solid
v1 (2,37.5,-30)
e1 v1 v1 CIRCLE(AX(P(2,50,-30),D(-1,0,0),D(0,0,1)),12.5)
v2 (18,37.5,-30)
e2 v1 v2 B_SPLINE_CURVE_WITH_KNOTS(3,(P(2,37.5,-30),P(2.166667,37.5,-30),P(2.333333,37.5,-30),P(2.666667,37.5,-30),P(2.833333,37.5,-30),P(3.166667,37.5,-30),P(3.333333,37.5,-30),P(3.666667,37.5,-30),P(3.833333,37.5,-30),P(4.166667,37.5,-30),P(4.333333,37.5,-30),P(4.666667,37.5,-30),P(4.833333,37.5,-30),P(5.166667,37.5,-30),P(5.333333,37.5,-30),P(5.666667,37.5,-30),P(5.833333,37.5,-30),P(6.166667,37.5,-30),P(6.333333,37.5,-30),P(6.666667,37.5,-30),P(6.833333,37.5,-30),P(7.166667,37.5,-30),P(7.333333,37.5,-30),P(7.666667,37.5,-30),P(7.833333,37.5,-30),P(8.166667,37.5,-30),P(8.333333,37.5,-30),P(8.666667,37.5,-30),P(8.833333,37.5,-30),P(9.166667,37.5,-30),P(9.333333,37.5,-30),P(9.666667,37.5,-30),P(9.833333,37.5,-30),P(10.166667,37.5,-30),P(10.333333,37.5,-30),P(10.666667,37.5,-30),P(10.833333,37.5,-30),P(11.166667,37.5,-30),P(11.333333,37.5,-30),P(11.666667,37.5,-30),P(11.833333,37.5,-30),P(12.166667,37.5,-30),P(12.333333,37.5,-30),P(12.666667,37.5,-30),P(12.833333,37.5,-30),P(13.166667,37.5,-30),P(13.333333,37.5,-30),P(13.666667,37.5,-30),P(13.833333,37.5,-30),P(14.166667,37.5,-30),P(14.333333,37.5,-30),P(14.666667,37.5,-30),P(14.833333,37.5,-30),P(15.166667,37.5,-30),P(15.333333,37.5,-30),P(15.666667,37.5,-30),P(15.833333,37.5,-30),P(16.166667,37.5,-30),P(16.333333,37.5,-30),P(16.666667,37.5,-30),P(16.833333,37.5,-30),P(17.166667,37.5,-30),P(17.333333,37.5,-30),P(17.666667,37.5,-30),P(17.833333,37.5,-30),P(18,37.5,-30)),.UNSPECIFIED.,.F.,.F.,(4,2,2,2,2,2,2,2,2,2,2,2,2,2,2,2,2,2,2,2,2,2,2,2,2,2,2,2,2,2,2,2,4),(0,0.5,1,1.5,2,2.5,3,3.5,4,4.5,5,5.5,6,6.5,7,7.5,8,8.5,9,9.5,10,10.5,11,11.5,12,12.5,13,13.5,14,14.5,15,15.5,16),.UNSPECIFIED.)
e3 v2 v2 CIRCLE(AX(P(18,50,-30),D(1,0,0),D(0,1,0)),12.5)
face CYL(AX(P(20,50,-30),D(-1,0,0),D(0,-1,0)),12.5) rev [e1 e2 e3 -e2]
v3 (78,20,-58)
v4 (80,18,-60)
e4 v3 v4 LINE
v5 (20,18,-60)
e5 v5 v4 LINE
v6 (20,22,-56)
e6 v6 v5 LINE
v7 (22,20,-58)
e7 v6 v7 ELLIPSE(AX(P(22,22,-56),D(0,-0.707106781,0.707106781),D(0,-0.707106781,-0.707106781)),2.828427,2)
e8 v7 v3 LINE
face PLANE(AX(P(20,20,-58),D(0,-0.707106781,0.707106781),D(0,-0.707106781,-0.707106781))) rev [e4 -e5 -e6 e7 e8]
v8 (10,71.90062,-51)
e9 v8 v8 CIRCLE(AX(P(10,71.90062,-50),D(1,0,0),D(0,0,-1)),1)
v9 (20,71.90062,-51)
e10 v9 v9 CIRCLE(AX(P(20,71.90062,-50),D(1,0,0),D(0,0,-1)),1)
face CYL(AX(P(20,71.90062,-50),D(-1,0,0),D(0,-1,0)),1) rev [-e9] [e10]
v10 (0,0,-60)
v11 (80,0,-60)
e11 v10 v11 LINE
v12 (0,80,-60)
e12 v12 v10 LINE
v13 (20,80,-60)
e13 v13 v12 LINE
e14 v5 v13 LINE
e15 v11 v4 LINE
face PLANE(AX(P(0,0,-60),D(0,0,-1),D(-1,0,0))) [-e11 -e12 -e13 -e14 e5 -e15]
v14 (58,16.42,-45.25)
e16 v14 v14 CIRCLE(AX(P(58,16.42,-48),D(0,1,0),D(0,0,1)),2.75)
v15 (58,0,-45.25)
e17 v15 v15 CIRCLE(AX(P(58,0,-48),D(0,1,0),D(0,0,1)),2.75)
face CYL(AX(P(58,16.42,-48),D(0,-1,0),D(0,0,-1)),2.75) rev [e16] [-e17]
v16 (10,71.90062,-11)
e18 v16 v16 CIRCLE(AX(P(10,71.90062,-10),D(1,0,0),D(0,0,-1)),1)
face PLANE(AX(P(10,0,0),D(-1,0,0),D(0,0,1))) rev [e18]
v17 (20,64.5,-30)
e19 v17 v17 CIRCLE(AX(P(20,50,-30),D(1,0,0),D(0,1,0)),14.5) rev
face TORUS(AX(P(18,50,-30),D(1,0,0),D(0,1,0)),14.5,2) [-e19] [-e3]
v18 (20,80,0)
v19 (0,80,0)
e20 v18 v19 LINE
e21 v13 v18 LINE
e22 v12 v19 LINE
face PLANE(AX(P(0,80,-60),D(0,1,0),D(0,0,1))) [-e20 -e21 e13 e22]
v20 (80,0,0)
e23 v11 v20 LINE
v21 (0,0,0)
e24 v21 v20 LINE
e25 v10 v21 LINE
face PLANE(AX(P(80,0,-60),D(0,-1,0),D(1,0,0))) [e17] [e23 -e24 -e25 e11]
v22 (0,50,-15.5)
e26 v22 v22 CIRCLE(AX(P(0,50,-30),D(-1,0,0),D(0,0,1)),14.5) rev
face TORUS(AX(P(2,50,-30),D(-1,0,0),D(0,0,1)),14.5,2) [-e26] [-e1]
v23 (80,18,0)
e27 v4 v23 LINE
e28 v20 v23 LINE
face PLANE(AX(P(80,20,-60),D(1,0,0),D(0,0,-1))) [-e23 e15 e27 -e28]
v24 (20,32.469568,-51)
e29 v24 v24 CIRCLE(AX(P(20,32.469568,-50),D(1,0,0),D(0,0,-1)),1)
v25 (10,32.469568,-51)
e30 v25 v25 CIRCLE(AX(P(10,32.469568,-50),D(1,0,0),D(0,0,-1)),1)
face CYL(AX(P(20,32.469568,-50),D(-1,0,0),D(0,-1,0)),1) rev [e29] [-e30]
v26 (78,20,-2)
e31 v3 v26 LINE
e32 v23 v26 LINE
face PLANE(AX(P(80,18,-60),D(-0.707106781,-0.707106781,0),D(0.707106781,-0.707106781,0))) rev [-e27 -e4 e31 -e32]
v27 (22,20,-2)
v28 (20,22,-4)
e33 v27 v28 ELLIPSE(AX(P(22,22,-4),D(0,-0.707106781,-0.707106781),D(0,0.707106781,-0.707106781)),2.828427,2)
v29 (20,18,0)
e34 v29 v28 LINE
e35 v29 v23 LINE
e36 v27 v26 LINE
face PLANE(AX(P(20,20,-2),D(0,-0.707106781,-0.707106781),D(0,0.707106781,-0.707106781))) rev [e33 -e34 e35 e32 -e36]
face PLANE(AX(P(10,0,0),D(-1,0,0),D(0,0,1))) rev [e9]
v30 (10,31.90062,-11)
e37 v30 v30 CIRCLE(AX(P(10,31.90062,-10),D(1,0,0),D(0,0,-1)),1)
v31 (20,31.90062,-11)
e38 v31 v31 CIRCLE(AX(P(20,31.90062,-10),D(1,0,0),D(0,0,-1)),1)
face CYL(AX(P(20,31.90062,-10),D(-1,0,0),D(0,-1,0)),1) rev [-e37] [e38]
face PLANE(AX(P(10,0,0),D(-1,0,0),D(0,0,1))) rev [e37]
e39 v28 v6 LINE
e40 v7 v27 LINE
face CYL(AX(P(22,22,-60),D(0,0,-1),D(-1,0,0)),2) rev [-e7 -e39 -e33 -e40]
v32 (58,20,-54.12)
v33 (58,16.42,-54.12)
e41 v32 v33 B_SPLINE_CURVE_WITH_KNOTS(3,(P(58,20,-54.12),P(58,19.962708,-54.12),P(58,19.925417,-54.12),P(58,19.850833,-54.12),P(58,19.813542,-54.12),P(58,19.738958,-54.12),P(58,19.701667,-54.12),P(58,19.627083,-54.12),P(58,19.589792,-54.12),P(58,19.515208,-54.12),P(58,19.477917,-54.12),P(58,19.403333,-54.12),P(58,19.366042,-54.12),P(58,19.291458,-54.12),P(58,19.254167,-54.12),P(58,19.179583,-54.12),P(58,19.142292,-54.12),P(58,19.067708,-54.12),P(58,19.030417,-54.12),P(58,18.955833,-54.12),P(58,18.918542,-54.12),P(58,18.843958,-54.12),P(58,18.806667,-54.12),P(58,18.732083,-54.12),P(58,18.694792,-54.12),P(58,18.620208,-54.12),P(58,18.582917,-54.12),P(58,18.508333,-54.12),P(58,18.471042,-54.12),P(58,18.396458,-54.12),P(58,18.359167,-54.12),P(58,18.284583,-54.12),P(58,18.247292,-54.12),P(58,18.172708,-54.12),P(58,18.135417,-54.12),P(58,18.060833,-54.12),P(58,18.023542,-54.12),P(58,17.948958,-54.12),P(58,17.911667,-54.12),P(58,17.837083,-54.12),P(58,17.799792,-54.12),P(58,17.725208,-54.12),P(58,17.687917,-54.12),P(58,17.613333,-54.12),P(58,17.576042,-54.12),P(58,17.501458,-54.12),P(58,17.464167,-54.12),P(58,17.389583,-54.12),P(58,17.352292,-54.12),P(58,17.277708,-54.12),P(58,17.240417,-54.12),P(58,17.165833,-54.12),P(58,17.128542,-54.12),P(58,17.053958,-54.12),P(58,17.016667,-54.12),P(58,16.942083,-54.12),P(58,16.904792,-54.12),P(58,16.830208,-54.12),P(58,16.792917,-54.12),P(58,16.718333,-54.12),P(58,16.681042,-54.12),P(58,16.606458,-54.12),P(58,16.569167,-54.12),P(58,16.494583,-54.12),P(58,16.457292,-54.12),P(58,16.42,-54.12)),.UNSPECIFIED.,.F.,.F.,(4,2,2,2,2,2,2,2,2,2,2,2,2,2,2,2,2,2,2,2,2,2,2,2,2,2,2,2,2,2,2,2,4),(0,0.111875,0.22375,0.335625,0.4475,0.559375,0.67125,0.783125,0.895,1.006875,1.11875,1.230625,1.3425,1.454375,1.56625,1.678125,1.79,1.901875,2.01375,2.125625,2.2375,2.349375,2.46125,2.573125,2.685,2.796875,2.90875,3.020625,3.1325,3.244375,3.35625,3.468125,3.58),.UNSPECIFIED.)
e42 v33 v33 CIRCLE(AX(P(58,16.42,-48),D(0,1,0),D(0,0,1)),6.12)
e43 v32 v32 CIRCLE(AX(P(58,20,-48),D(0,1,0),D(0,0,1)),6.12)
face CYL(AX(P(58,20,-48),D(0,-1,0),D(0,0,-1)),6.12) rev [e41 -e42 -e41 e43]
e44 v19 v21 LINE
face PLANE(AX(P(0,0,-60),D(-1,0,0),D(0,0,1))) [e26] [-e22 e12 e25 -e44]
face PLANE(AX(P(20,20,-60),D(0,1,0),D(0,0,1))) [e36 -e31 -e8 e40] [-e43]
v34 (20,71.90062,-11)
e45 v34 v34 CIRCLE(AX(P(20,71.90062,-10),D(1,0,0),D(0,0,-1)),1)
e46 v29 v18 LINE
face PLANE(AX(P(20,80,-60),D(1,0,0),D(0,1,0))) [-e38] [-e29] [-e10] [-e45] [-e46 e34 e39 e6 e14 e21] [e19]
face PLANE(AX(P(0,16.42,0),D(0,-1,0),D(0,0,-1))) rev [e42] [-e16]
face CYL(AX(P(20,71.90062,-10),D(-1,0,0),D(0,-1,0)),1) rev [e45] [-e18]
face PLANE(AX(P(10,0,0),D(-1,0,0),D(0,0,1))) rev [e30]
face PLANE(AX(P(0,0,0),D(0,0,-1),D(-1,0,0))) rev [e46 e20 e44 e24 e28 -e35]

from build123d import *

# Parameters (mm, degrees)
BOSS_EXTRUDE1_DEPTH    = 60
F_3DSKETCH1_R          = 1
CUT_EXTRUDE1_DEPTH     = 10
CUT_EXTRUDE3_OUTLINE_R = 12.5
CUT_EXTRUDE3_DEPTH     = 20
FILLET1_R              = 2
CUT_EXTRUDE4_DEPTH     = 60
FILLET2_R              = 2
CUT_EXTRUDE5_DEPTH     = 60
CUT_EXTRUDE8_START     = 16.42
CUT_EXTRUDE8_OUTLINE_R = 6.12
CUT_EXTRUDE8_DEPTH     = 3.58
CUT_EXTRUDE9_OUTLINE_R = 2.75
CUT_EXTRUDE9_DEPTH     = 16.42


# Read off the part's stored shape, not the designer's step: Cut-Extrude3, Cut-Extrude8, Cut-Extrude9
with BuildPart() as part:
    # Sketch1 → Boss-Extrude1 (new body)
    with BuildSketch(Plane.XY):
        Polygon((0, 0), (0, 80), (20, 80), (20, 20), (80, 20), (80, 0), align=None)
    extrude(amount=-BOSS_EXTRUDE1_DEPTH)

    # 3DSketch1 → Cut-Extrude1 (cut)
    with BuildSketch(Plane(origin=(20, 71.90061973, -50), x_dir=(0, -0.7071067811865477, 0.7071067811865475), z_dir=(-1, 0, 0))):
        with Locations(Location((0, 0, 0), (0, 0, 225))):
            Circle(F_3DSKETCH1_R)
        with Locations(Location((28.284271247, 28.284271247, 0), (0, 0, 225))):
            Circle(F_3DSKETCH1_R)
        with Locations(Location((27.881964101, -27.881964101, 0), (0, 0, 225))):
            Circle(F_3DSKETCH1_R)
        with Locations(Location((56.568542495, 0, 0), (0, 0, 225))):
            Circle(F_3DSKETCH1_R)
    extrude(amount=CUT_EXTRUDE1_DEPTH, mode=Mode.SUBTRACT)

    # Cut-Extrude3 outline → Cut-Extrude3 (cut)
    with BuildSketch(Plane.YZ):
        with Locations((50, -30)):
            Circle(CUT_EXTRUDE3_OUTLINE_R)
    extrude(amount=CUT_EXTRUDE3_DEPTH, mode=Mode.SUBTRACT)

    # Fillet1
    fillet1_edges = [part.edges().sort_by_distance(p)[0] for p in [
        (20, 37.5, -30),
        (0, 37.5, -30),
    ]]
    fillet(fillet1_edges, radius=FILLET1_R)

    # Sketch7 → Cut-Extrude4 (cut)
    with BuildSketch(Plane(origin=(80, 0, 0), x_dir=(0, 0, -1), z_dir=(1, 0, 0))):
        Polygon((0, 20), (2, 20), (0, 18), align=None)
        Polygon((60, 20), (58, 20), (60, 18), align=None)
    extrude(amount=-CUT_EXTRUDE4_DEPTH, mode=Mode.SUBTRACT)

    # Fillet2
    fillet2_edges = [part.edges().sort_by_distance(p)[0] for p in [
        (20, 20, -30),
    ]]
    fillet(fillet2_edges, radius=FILLET2_R)

    # Sketch8 → Cut-Extrude5 (cut)
    with BuildSketch(Plane.XY):
        Polygon((78, 20), (80, 20), (80, 18), align=None)
    extrude(amount=-CUT_EXTRUDE5_DEPTH, mode=Mode.SUBTRACT)

    # Cut-Extrude8 outline → Cut-Extrude8 (cut)
    with BuildSketch(Plane(origin=(0, 0, 0), x_dir=(1, 0, 0), z_dir=(0, 1, 0)).offset(CUT_EXTRUDE8_START)):
        with Locations((58, 48)):
            Circle(CUT_EXTRUDE8_OUTLINE_R)
    extrude(amount=CUT_EXTRUDE8_DEPTH, mode=Mode.SUBTRACT)

    # Cut-Extrude9 outline → Cut-Extrude9 (cut)
    with BuildSketch(Plane(origin=(0, 0, 0), x_dir=(1, 0, 0), z_dir=(0, 1, 0))):
        with Locations((58, 48)):
            Circle(CUT_EXTRUDE9_OUTLINE_R)
    extrude(amount=CUT_EXTRUDE9_DEPTH, mode=Mode.SUBTRACT)


solid = part.part
